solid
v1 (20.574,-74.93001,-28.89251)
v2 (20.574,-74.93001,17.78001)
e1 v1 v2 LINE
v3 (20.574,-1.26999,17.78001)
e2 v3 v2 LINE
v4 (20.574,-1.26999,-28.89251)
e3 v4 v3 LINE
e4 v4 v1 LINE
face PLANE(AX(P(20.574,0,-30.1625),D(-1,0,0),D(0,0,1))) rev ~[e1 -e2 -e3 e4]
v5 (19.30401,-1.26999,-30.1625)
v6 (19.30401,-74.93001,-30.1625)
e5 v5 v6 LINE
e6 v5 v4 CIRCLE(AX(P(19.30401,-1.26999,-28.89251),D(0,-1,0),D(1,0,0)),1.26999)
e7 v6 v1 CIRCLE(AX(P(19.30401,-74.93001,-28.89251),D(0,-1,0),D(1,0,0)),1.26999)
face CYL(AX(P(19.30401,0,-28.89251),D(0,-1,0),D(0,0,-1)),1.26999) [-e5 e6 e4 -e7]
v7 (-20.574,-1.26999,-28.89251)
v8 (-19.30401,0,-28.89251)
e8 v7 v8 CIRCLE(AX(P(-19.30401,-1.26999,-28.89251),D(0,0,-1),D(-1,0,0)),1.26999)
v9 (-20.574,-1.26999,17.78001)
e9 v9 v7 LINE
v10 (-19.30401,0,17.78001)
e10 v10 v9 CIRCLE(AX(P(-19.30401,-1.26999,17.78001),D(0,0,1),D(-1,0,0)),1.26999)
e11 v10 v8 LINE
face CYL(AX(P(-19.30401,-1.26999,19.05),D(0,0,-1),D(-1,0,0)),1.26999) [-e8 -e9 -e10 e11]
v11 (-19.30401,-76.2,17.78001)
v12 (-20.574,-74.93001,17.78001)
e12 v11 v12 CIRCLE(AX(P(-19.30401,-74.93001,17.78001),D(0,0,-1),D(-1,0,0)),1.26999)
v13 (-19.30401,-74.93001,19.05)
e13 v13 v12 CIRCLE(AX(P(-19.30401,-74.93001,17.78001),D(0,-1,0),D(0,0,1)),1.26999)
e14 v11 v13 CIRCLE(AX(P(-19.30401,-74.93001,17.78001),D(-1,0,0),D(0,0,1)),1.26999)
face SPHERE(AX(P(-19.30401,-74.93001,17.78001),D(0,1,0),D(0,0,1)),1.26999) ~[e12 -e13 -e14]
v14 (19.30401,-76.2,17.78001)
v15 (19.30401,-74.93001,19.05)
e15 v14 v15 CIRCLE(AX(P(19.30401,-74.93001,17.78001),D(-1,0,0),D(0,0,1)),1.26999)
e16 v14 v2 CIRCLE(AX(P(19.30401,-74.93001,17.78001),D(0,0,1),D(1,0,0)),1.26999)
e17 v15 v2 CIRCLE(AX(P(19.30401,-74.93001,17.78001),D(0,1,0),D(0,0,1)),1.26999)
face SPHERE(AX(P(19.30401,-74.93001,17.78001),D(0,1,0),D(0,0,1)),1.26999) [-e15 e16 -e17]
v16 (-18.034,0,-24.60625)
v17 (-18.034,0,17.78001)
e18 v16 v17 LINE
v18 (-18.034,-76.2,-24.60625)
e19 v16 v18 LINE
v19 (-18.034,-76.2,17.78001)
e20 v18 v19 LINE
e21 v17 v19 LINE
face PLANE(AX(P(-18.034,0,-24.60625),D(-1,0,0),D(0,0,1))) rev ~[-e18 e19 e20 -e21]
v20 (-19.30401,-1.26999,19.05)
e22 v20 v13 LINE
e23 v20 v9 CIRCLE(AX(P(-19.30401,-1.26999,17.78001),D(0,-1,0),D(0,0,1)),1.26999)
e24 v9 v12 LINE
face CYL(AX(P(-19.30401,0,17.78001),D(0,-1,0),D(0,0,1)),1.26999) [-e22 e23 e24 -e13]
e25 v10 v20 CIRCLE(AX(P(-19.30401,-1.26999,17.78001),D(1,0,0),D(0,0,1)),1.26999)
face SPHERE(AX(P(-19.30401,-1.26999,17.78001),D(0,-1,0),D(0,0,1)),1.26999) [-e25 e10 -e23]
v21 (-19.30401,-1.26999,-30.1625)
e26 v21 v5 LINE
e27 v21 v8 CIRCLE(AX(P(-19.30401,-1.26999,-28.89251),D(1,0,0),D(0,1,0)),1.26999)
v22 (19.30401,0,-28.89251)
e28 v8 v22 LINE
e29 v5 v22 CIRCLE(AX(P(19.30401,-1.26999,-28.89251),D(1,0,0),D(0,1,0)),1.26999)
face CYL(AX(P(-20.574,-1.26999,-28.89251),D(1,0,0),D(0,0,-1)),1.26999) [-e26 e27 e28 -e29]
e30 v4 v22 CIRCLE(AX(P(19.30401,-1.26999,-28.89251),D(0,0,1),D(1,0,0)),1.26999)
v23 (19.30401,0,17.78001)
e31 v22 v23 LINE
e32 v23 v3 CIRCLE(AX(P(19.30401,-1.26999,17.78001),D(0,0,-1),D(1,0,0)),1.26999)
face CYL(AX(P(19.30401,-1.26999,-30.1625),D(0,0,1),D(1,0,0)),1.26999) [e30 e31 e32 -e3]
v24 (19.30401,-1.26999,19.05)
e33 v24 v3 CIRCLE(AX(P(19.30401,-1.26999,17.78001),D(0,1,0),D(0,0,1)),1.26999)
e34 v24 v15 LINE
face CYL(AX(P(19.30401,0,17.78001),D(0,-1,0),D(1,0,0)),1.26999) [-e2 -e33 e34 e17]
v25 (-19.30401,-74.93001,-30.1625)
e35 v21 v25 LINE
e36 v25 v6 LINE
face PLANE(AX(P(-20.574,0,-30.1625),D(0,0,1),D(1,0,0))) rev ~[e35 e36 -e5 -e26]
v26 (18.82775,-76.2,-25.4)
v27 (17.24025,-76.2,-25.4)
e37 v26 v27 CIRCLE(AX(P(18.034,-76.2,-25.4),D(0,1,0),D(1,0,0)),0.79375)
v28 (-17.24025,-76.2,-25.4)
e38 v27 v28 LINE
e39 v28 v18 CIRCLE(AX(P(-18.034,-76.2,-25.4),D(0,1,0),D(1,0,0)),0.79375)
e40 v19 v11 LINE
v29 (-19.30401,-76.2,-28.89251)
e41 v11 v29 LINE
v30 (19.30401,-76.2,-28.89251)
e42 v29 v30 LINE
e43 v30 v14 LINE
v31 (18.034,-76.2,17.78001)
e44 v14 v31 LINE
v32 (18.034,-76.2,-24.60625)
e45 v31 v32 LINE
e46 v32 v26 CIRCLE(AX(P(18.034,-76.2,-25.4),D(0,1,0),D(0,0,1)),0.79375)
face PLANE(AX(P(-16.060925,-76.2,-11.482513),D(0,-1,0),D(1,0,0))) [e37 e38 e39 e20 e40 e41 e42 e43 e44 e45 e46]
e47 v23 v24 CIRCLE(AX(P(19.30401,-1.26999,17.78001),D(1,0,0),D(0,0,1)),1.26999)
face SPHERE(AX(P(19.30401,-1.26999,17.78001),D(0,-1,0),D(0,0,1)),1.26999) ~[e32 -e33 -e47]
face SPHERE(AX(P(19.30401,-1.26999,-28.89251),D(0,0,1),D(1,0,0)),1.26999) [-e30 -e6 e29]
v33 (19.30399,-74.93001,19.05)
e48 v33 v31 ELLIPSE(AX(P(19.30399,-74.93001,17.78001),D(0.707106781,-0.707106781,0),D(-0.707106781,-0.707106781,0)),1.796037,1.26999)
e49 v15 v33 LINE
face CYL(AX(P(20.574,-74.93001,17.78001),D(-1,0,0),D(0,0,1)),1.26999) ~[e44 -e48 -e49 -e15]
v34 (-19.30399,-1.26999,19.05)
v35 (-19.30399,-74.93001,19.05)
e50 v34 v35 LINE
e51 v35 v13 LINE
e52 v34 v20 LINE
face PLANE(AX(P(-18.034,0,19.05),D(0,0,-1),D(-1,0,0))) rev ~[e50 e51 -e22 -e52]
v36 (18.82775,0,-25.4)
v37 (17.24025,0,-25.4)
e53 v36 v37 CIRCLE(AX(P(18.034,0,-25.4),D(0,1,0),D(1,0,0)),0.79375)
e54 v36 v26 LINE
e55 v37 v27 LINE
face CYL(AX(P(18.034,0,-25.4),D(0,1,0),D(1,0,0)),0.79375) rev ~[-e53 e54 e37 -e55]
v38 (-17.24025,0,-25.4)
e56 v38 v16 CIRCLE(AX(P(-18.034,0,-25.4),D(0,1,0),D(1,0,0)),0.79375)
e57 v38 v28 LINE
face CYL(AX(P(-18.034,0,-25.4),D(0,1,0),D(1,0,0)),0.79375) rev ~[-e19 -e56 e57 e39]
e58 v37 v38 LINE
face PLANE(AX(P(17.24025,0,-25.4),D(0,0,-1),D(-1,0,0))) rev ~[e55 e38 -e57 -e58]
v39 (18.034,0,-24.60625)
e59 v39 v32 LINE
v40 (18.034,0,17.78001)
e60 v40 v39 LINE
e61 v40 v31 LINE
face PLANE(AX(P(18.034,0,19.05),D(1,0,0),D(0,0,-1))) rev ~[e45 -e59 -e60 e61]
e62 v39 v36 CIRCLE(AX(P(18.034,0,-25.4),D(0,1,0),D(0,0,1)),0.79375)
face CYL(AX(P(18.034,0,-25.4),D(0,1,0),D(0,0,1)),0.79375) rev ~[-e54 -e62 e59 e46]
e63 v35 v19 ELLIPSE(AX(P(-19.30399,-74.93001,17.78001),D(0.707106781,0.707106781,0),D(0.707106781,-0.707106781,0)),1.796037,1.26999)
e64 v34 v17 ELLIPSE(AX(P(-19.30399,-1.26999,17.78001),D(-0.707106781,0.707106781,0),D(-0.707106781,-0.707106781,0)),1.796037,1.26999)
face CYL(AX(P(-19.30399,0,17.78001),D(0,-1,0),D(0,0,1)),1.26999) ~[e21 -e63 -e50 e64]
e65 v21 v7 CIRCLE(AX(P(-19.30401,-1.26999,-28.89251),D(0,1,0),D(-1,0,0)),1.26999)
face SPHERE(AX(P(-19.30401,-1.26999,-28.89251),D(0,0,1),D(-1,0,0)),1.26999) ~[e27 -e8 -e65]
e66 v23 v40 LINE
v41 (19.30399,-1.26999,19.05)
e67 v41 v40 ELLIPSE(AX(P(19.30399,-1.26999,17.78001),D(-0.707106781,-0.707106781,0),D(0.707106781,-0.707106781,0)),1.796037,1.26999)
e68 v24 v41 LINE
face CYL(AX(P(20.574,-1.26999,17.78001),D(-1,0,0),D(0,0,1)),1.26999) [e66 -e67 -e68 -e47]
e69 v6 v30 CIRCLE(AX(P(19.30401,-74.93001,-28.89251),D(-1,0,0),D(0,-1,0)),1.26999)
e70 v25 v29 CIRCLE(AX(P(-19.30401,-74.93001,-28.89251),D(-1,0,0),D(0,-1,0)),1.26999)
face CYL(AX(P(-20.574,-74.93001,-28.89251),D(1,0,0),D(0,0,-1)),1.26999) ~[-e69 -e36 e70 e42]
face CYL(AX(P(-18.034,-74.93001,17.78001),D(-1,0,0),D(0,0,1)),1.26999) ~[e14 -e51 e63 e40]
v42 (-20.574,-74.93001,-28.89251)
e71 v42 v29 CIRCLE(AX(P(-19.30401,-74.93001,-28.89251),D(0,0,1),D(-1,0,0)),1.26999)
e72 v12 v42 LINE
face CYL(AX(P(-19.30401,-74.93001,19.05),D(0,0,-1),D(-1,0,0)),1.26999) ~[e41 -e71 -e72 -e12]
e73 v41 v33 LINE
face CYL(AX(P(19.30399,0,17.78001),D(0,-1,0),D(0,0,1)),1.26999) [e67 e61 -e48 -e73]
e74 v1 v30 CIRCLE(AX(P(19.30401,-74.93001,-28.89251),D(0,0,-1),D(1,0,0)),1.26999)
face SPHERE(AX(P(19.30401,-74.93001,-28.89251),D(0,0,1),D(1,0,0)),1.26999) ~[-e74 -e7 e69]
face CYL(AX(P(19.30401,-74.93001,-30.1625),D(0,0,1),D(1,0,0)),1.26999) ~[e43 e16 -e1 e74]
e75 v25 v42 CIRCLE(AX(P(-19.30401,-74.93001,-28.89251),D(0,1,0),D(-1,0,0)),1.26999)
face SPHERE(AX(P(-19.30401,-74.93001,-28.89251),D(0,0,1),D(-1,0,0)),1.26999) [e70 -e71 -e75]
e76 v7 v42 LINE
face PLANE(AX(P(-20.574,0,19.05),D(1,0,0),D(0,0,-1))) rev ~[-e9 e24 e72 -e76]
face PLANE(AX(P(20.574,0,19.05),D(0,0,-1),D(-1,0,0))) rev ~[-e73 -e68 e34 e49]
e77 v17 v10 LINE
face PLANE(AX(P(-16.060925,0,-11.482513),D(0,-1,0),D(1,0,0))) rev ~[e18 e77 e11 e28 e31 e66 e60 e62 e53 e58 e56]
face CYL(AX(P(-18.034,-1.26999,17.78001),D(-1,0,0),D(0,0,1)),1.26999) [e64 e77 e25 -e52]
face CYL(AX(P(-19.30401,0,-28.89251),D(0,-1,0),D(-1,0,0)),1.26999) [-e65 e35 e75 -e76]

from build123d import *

# Parameters (mm, degrees)
F1_DEPTH = 76.2
F2_R     = 1.26999


# Not quite as in the source:
# - a fillet or chamfer is up to 0.001 mm smaller than in the source, because OpenCascade refuses the exact size


with BuildPart() as f1:
    # F0 (on Front) → F1 (new body)
    with BuildSketch(Plane.XZ):
        with BuildLine():
            Line((-18.034, 19.05), (-20.574, 19.05))
            Line((-20.574, 19.05), (-20.574, -30.1625))
            Line((-20.574, -30.1625), (0, -30.1625))
            Line((0, -30.1625), (0, -25.4))
            Line((0, -25.4), (-17.24025, -25.4))
            ThreePointArc((-17.24025, -25.4), (-18.5952660076, -25.9612660076), (-18.034, -24.60625))
            Line((-18.034, -24.60625), (-18.034, 19.05))
        make_face()
        with BuildLine():
            Line((0, -25.4), (0, -30.1625))
            Line((0, -30.1625), (20.574, -30.1625))
            Line((20.574, -30.1625), (20.574, 19.05))
            Line((20.574, 19.05), (18.034, 19.05))
            Line((18.034, 19.05), (18.034, -24.60625))
            ThreePointArc((18.034, -24.60625), (18.5952660076, -24.8387339924), (18.82775, -25.4))
            ThreePointArc((18.82775, -25.4), (18.034, -26.19375), (17.24025, -25.4))
            Line((17.24025, -25.4), (0, -25.4))
        make_face()
    extrude(amount=F1_DEPTH)

    # F2 (radius 1.27 in the source; OpenCascade refuses exactly that, so slightly less here)
    f2_edges = [f1.edges().sort_by_distance(p)[0] for p in [
        (20.574, -38.1, 19.05),
        (18.034, -38.1, 19.05),
        (19.304, 0, 19.05),
        (19.304, -76.2, 19.05),
        (-18.034, -38.1, 19.05),
        (-20.574, -38.1, 19.05),
        (-19.304, 0, 19.05),
        (-19.304, -76.2, 19.05),
        (-20.574, -76.2, -5.55625),
        (20.574, -76.2, -5.55625),
        (20.574, 0, -5.55625),
        (-20.574, 0, -5.55625),
        (-20.574, -38.1, -30.1625),
        (20.574, -38.1, -30.1625),
        (0, 0, -30.1625),
        (0, -76.2, -30.1625),
    ]]
    fillet(f2_edges, radius=F2_R)


solid = f1.part
